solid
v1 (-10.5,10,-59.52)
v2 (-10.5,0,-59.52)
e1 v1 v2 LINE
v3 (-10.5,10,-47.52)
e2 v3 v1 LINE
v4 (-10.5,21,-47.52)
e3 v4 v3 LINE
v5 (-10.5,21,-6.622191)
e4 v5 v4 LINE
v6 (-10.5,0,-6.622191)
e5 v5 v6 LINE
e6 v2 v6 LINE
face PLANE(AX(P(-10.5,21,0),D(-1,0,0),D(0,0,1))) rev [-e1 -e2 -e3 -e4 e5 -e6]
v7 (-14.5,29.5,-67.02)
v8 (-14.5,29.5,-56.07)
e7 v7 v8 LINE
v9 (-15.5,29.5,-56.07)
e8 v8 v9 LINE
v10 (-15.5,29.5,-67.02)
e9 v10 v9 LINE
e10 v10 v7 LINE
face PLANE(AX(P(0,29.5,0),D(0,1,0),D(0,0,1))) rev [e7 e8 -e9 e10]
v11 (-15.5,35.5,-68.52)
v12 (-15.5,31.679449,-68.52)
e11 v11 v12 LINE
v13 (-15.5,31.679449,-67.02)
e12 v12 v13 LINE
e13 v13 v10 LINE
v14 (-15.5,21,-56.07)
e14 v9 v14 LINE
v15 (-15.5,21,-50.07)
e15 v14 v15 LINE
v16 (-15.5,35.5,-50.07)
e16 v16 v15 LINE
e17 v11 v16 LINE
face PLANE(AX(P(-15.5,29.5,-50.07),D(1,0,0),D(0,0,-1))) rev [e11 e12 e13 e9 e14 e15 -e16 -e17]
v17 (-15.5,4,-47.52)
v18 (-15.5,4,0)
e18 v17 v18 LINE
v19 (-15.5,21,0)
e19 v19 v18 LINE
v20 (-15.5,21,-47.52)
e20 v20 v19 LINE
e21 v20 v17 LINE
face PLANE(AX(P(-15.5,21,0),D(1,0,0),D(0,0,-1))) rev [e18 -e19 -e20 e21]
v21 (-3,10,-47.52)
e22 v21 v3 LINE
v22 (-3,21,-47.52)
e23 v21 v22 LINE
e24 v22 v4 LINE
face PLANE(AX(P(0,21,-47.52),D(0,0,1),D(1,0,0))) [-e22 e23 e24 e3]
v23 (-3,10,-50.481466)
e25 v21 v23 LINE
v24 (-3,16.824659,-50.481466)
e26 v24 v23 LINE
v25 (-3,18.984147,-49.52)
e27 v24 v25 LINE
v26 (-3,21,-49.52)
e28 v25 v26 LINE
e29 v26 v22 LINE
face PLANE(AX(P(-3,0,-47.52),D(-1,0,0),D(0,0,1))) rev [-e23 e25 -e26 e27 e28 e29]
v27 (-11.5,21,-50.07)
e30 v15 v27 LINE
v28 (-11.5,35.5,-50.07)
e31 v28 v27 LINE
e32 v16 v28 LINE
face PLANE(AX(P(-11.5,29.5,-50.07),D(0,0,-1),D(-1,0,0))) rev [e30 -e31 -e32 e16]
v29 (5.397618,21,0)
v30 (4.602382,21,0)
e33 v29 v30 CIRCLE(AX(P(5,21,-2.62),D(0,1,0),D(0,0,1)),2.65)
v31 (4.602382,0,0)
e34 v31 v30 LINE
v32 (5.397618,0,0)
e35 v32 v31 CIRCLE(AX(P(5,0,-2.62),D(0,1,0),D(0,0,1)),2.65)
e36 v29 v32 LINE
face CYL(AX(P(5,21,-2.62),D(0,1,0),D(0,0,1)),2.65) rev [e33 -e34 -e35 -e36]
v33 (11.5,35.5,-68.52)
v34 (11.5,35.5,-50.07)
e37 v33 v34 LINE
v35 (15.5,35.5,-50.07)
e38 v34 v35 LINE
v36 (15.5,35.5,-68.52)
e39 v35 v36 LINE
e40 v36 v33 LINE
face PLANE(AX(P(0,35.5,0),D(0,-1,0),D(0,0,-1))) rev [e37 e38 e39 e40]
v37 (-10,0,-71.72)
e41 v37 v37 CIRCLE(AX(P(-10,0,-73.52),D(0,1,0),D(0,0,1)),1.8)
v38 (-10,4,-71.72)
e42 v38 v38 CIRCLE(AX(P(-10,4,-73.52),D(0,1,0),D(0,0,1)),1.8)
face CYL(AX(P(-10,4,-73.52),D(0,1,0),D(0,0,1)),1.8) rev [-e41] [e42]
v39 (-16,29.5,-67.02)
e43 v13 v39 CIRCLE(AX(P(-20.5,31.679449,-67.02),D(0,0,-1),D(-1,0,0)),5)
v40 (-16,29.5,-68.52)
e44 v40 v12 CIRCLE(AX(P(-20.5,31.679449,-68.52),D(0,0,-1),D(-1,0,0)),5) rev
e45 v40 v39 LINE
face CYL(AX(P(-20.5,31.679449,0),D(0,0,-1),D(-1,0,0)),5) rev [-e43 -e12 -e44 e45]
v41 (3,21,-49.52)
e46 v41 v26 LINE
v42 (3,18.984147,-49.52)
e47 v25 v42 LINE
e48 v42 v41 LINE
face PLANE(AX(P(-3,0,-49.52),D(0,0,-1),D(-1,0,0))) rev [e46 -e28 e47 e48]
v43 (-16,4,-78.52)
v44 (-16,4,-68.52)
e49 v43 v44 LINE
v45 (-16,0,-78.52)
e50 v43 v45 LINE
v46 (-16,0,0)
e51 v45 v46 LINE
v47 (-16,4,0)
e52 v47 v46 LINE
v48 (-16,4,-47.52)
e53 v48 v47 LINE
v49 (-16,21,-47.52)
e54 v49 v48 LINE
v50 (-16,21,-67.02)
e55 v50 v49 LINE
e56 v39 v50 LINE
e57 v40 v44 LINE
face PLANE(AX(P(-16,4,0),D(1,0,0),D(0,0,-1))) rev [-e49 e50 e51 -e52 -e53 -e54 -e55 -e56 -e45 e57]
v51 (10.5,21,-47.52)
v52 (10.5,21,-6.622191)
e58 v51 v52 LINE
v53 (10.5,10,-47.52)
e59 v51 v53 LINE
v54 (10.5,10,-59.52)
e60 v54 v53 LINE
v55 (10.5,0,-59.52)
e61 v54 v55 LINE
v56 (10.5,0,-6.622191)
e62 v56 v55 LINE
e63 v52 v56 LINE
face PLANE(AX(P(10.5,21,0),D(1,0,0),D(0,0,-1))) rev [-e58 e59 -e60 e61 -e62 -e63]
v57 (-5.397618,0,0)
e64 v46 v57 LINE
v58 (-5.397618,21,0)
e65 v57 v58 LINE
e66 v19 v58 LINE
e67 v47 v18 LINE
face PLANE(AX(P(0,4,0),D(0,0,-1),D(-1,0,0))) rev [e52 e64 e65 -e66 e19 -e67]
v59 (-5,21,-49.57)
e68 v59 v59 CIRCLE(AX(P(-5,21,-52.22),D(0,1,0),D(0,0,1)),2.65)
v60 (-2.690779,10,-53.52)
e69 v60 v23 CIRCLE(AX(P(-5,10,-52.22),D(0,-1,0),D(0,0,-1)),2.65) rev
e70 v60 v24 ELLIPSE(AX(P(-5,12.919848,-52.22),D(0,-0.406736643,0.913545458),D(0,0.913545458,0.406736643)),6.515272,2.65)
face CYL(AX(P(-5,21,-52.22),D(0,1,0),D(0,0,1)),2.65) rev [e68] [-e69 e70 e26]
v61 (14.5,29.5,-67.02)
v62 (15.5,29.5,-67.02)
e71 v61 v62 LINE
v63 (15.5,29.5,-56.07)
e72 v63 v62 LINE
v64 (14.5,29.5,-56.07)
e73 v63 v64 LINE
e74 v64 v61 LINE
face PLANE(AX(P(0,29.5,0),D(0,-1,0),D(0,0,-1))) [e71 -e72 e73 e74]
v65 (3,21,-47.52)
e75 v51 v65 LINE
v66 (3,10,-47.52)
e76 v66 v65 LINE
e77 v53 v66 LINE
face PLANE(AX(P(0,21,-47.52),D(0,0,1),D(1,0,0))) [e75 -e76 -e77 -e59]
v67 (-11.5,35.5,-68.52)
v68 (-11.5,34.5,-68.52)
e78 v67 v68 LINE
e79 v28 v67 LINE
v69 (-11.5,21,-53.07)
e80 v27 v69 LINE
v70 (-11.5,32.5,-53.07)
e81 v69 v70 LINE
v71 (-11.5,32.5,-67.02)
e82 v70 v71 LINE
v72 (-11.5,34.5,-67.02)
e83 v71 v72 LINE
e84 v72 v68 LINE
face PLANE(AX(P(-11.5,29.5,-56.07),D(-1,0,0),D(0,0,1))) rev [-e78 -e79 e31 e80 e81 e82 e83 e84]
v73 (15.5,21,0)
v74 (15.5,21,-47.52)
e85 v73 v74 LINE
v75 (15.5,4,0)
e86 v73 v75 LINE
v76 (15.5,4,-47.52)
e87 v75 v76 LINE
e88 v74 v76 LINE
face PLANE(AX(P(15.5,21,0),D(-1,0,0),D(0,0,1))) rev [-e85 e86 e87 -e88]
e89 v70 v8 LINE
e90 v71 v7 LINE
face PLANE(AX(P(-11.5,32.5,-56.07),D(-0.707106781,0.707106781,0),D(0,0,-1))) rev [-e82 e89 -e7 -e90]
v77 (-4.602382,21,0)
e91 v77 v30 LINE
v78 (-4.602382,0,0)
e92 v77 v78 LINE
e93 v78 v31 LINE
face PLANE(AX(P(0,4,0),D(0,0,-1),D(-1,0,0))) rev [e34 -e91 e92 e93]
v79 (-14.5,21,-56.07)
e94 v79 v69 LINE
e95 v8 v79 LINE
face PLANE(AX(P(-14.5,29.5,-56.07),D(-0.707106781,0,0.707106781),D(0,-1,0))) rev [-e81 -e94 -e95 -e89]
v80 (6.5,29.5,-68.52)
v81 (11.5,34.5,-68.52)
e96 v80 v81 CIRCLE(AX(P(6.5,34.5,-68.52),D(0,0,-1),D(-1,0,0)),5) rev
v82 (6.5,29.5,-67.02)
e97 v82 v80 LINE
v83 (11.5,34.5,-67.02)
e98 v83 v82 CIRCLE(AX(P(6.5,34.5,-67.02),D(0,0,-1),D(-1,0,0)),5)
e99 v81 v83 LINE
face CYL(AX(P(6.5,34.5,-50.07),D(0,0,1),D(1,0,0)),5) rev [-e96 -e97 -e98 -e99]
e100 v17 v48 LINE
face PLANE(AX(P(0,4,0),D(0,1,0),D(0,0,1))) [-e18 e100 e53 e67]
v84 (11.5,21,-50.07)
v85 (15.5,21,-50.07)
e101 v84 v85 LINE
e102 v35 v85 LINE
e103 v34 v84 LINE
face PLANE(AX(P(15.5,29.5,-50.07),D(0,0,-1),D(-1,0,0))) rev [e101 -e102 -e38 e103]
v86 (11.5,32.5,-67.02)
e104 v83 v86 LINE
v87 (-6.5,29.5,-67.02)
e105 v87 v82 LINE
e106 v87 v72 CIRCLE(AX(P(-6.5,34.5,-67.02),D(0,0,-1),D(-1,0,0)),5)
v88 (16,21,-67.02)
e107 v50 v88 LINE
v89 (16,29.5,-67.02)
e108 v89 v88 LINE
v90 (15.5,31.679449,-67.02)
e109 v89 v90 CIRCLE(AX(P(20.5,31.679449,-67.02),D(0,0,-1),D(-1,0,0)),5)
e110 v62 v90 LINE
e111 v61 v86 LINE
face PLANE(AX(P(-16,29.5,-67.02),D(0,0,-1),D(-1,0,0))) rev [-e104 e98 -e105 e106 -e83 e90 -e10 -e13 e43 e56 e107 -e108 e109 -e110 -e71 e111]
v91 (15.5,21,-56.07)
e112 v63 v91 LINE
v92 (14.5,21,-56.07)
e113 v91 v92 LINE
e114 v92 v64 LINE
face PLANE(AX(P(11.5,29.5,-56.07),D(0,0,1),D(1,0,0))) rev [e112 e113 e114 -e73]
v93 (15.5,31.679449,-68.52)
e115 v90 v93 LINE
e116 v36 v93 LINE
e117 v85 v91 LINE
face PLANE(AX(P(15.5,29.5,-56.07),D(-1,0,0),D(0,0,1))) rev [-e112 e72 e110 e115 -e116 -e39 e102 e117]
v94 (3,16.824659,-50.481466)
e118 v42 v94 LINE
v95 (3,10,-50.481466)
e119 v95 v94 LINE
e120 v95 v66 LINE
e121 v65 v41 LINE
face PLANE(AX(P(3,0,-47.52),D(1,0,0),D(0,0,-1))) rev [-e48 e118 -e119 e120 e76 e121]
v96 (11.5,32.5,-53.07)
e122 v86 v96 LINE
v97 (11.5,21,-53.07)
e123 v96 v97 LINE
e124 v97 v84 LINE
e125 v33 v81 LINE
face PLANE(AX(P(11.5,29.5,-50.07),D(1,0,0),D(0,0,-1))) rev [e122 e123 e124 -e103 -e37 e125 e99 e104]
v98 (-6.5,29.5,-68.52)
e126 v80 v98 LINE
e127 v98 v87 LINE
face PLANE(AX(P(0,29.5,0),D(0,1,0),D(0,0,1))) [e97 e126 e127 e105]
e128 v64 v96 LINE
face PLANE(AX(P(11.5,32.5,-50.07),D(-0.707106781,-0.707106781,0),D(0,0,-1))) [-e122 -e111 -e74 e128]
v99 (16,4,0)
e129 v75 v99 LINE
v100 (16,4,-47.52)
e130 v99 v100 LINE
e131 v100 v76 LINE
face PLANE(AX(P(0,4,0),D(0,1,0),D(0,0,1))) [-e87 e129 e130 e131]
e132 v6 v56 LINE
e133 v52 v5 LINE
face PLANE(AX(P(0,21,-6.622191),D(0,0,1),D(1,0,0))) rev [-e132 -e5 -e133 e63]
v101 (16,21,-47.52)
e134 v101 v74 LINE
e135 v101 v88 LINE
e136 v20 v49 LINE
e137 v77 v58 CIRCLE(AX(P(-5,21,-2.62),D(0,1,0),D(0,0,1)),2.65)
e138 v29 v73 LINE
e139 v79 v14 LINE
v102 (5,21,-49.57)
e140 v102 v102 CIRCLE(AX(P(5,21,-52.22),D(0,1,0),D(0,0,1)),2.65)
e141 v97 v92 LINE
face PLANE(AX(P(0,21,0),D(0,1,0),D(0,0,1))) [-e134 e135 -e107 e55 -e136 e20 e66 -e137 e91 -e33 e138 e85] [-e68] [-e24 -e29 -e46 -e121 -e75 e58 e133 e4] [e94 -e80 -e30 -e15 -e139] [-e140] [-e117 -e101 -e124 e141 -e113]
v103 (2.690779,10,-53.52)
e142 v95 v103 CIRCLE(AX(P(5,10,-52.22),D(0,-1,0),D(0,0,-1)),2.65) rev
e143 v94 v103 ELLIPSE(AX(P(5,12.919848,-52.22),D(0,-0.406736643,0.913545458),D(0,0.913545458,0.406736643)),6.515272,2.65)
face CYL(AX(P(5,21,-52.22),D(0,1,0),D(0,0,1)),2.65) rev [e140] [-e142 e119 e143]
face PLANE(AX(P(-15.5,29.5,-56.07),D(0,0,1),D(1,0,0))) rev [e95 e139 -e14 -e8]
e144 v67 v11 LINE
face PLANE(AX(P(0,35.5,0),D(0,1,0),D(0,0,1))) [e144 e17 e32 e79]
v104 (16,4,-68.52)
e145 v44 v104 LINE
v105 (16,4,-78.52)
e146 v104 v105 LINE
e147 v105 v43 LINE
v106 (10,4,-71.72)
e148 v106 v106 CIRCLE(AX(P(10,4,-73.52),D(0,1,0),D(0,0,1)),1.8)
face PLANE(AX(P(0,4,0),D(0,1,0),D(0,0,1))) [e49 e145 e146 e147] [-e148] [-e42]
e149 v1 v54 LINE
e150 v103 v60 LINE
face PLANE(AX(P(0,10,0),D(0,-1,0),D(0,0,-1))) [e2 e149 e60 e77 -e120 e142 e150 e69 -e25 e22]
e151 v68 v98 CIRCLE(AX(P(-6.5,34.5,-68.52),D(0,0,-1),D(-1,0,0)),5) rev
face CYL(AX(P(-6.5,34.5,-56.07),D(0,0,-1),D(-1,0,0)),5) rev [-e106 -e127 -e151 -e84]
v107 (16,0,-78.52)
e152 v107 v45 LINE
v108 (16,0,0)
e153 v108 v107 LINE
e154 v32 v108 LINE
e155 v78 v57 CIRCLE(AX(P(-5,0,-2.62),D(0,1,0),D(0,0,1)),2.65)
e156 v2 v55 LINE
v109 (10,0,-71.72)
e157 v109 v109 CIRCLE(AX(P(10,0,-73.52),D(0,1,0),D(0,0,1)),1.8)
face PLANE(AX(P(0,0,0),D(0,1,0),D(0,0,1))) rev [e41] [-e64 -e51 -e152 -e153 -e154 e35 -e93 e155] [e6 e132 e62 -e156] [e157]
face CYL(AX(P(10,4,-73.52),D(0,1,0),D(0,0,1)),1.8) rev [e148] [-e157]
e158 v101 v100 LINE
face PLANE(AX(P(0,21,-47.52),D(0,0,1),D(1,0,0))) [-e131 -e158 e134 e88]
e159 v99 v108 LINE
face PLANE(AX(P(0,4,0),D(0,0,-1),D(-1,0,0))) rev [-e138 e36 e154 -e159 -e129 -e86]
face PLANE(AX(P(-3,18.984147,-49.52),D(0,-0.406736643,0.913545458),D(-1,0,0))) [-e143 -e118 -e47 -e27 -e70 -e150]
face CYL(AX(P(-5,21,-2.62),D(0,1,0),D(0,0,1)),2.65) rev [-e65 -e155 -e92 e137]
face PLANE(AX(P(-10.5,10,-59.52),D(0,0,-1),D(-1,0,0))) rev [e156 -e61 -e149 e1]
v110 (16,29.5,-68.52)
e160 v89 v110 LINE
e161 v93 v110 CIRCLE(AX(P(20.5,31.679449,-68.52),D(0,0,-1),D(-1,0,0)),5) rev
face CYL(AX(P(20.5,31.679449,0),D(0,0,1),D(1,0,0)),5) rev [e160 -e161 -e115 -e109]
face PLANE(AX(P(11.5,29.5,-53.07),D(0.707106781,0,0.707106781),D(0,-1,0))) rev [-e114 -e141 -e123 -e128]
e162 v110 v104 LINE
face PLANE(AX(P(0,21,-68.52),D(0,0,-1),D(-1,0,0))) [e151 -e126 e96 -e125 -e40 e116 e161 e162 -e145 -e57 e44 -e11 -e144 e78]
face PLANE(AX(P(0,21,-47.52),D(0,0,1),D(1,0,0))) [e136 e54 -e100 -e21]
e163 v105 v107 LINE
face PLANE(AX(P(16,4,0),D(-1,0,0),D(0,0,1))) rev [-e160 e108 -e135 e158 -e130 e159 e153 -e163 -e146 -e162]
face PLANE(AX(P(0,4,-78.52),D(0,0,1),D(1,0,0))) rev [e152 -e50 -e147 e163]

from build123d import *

# Parameters (mm, degrees)
SKETCH1_W                  = 32
SKETCH1_H                  = 78.52
BOSS_EXTRUDE1_DEPTH        = 4
M3_CLEARANCE_HOLE1_D       = 3.6
M3_CLEARANCE_HOLE1_DEPTH   = 10
M3_CLEARANCE_HOLE1_TIP     = 1.081549114
BOSS_EXTRUDE2_DEPTH        = 17
BOSS_EXTRUDE3_DEPTH        = 17
SKETCH6_W                  = 32
SKETCH6_H                  = 1.5
SKETCH6_W_2                = 4
SKETCH6_H_2                = 6
BOSS_EXTRUDE4_DEPTH        = 8.5
SKETCH14_W                 = 4
SKETCH14_H                 = 18.45
BOSS_EXTRUDE5_DEPTH        = 6
FILLET1_R                  = 5
CHAMFER1_SIZE              = 3
CHAMFER2_SIZE              = 3
CUT_EXTRUDE1_DEPTH         = 87.102499383
CUT_EXTRUDE1_DEPTH_BACK    = 87.102499383
SKETCH15_W                 = 21
SKETCH15_H                 = 40.897809358
F_5_3_5_3_DIAMETER_HOLE1_D = 5.3
SKETCH19_W                 = 21
SKETCH19_H                 = 12
CUT_EXTRUDE2_DEPTH         = 10
CUT_EXTRUDE3_DEPTH         = 83.839546112
CUT_EXTRUDE3_DEPTH_BACK    = 83.839546112
SKETCH20_W                 = 6
SKETCH20_H                 = 2
CHAMFER3_SIZE              = 8.984147096
CHAMFER3_SIZE_2            = 4


with BuildPart() as part:
    # Sketch1 → Boss-Extrude1 (new body)
    with BuildSketch(Plane(origin=(0, 0, 0), x_dir=(1, 0, 0), z_dir=(0, 1, 0))):
        with Locations((0, 39.26)):
            Rectangle(SKETCH1_W, SKETCH1_H)
    extrude(amount=BOSS_EXTRUDE1_DEPTH)

    # M3 Clearance Hole1
    with Locations(Plane(origin=(0, 4, 0), x_dir=(1, 0, 0), z_dir=(0, 1, 0))):
        with Locations((-10, 73.52), (10, 73.52)):
            Hole(M3_CLEARANCE_HOLE1_D / 2, depth=M3_CLEARANCE_HOLE1_DEPTH)
            with Locations((0, 0, -(M3_CLEARANCE_HOLE1_DEPTH + M3_CLEARANCE_HOLE1_TIP / 2))):  # 118° drill point
                Cone(0, M3_CLEARANCE_HOLE1_D / 2, M3_CLEARANCE_HOLE1_TIP, mode=Mode.SUBTRACT)

    # Sketch5 → Boss-Extrude2 (add)
    with BuildSketch(Plane(origin=(0, 4, 0), x_dir=(1, 0, 0), z_dir=(0, 1, 0))):
        Polygon((16, 68.52), (-16, 68.52), (-16, 47.520000358), (-15.5, 47.520000358), (-10.5, 47.520000358), (10.5, 47.520000358), (15.5, 47.520000358), (16, 47.520000358), align=None)
    extrude(amount=BOSS_EXTRUDE2_DEPTH)

    # Sketch5<4> → Boss-Extrude3 (add)
    with BuildSketch(Plane(origin=(0, 4, 0), x_dir=(1, 0, 0), z_dir=(0, 1, 0))):
        Polygon((-10.5, 47.520000358), (-15.5, 47.520000358), (-15.5, 0), (15.5, 0), (15.5, 47.520000358), (10.5, 47.520000358), (10.5, 6.622191), (-10.5, 6.622191), align=None)
    extrude(amount=BOSS_EXTRUDE3_DEPTH)

    # Sketch6 → Boss-Extrude4 (add)
    with BuildSketch(Plane(origin=(0, 21, 0), x_dir=(1, 0, 0), z_dir=(0, 1, 0))):
        with Locations((0, 67.77)):
            Rectangle(SKETCH6_W, SKETCH6_H)
        with Locations((13.5, 53.07)):
            Rectangle(SKETCH6_W_2, SKETCH6_H_2)
        with Locations((-13.5, 53.07)):
            Rectangle(SKETCH6_W_2, SKETCH6_H_2)
    extrude(amount=BOSS_EXTRUDE4_DEPTH)

    # Sketch14 → Boss-Extrude5 (add)
    with BuildSketch(Plane(origin=(0, 29.5, 0), x_dir=(1, 0, 0), z_dir=(0, 1, 0))):
        with Locations((-13.5, 59.295)):
            Rectangle(SKETCH14_W, SKETCH14_H)
        with Locations((13.5, 59.295)):
            Rectangle(SKETCH14_W, SKETCH14_H)
    extrude(amount=BOSS_EXTRUDE5_DEPTH)

    # Fillet1
    # the kernel refuses this fillet: 5 mm, written as the material it adds along each edge
    with BuildSketch(Plane(origin=(-11.5, 29.5, -68.52), x_dir=(0, 1, 0), z_dir=(0, 0, 1)), Plane(origin=(11.5, 29.5, -68.52), x_dir=(-1, 0, 0), z_dir=(0, 0, 1))) as fillet1_piece_1:
        with BuildLine():
            CenterArc((FILLET1_R, -FILLET1_R), FILLET1_R, 90, 90)
            Line((0, -FILLET1_R), (0, 0))
            Line((0, 0), (FILLET1_R, 0))
        make_face()
    extrude(amount=1.5)
    with BuildSketch(Plane(origin=(-15.5, 29.5, -67.02), x_dir=(-1, 0, 0), z_dir=(0, 0, -1))) as fillet1_piece_2:
        with BuildLine():
            CenterArc((5, 2.179449472), FILLET1_R, 180, 25.841932763)
            Line((0, 2.179449472), (0, 0))
            Line((0, 0), (0.5, 0))
        make_face()
    extrude(amount=1.5)
    with BuildSketch(Plane(origin=(15.5, 29.5, -67.02), x_dir=(0, 1, 0), z_dir=(0, 0, -1))) as fillet1_piece_3:
        with BuildLine():
            CenterArc((2.179449472, 5), FILLET1_R, 244.158067237, 25.841932763)
            Line((0, 0.5), (0, 0))
            Line((0, 0), (2.179449472, 0))
        make_face()
    extrude(amount=1.5)

    # Chamfer1
    chamfer1_edges = [part.edges().sort_by_distance(p)[0] for p in [
        (-11.5, 29.5, -61.545),
        (11.5, 29.5, -61.545),
    ]]
    chamfer(chamfer1_edges, length=CHAMFER1_SIZE)

    # Chamfer2
    chamfer2_edges = [part.edges().sort_by_distance(p)[0] for p in [
        (11.5, 26.75, -56.07),
        (-11.5, 26.75, -56.07),
    ]]
    chamfer(chamfer2_edges, length=CHAMFER2_SIZE)

    # Sketch15 → Cut-Extrude1 (cut, two sides: drawn at the far end of the back side and taken through both)
    with BuildSketch(Plane(origin=(0, 4, 0), x_dir=(1, 0, 0), z_dir=(0, 1, 0)).offset(-CUT_EXTRUDE1_DEPTH_BACK)):
        with Locations((0, 27.071095679)):
            Rectangle(SKETCH15_W, SKETCH15_H)
    extrude(amount=CUT_EXTRUDE1_DEPTH + CUT_EXTRUDE1_DEPTH_BACK, mode=Mode.SUBTRACT)

    # Ø5.3 (5.3) Diameter Hole1 (through all)
    with Locations(Plane(origin=(0, 21, 0), x_dir=(1, 0, 0), z_dir=(0, 1, 0))):
        with Locations((-5, 52.220000358), (5, 52.220000358), (-5, 2.62), (5, 2.62)):
            Hole(F_5_3_5_3_DIAMETER_HOLE1_D / 2)

    # Sketch19 → Cut-Extrude2 (cut)
    with BuildSketch(Plane.XZ):
        with Locations((0, -53.520000358)):
            Rectangle(SKETCH19_W, SKETCH19_H)
    extrude(amount=-CUT_EXTRUDE2_DEPTH, mode=Mode.SUBTRACT)

    # Sketch20 → Cut-Extrude3 (cut, two sides: drawn at the far end of the back side and taken through both)
    with BuildSketch(Plane(origin=(0, 21, 0), x_dir=(1, 0, 0), z_dir=(0, 1, 0)).offset(-CUT_EXTRUDE3_DEPTH_BACK)):
        with Locations((0, 48.520000358)):
            Rectangle(SKETCH20_W, SKETCH20_H)
    extrude(amount=CUT_EXTRUDE3_DEPTH + CUT_EXTRUDE3_DEPTH_BACK, mode=Mode.SUBTRACT)

    # Chamfer3
    # the kernel refuses this chamfer: 8.984147096, 4 mm, written as the material it takes off along each edge
    with BuildSketch(Plane(origin=(-3, 10, -49.520000358), x_dir=(0, 0.9998768419809391, 0.015693975602887315), z_dir=(1, 0, 0))) as chamfer3_piece_1:
        Polygon((CHAMFER3_SIZE * 0.999876841938, -CHAMFER3_SIZE * 0.0156939756022), (-CHAMFER3_SIZE_2 * 0.0156939756029, -CHAMFER3_SIZE_2 * 0.999876841981), (0, 0), align=None)
    extrude(amount=6, mode=Mode.SUBTRACT)


solid = part.part
